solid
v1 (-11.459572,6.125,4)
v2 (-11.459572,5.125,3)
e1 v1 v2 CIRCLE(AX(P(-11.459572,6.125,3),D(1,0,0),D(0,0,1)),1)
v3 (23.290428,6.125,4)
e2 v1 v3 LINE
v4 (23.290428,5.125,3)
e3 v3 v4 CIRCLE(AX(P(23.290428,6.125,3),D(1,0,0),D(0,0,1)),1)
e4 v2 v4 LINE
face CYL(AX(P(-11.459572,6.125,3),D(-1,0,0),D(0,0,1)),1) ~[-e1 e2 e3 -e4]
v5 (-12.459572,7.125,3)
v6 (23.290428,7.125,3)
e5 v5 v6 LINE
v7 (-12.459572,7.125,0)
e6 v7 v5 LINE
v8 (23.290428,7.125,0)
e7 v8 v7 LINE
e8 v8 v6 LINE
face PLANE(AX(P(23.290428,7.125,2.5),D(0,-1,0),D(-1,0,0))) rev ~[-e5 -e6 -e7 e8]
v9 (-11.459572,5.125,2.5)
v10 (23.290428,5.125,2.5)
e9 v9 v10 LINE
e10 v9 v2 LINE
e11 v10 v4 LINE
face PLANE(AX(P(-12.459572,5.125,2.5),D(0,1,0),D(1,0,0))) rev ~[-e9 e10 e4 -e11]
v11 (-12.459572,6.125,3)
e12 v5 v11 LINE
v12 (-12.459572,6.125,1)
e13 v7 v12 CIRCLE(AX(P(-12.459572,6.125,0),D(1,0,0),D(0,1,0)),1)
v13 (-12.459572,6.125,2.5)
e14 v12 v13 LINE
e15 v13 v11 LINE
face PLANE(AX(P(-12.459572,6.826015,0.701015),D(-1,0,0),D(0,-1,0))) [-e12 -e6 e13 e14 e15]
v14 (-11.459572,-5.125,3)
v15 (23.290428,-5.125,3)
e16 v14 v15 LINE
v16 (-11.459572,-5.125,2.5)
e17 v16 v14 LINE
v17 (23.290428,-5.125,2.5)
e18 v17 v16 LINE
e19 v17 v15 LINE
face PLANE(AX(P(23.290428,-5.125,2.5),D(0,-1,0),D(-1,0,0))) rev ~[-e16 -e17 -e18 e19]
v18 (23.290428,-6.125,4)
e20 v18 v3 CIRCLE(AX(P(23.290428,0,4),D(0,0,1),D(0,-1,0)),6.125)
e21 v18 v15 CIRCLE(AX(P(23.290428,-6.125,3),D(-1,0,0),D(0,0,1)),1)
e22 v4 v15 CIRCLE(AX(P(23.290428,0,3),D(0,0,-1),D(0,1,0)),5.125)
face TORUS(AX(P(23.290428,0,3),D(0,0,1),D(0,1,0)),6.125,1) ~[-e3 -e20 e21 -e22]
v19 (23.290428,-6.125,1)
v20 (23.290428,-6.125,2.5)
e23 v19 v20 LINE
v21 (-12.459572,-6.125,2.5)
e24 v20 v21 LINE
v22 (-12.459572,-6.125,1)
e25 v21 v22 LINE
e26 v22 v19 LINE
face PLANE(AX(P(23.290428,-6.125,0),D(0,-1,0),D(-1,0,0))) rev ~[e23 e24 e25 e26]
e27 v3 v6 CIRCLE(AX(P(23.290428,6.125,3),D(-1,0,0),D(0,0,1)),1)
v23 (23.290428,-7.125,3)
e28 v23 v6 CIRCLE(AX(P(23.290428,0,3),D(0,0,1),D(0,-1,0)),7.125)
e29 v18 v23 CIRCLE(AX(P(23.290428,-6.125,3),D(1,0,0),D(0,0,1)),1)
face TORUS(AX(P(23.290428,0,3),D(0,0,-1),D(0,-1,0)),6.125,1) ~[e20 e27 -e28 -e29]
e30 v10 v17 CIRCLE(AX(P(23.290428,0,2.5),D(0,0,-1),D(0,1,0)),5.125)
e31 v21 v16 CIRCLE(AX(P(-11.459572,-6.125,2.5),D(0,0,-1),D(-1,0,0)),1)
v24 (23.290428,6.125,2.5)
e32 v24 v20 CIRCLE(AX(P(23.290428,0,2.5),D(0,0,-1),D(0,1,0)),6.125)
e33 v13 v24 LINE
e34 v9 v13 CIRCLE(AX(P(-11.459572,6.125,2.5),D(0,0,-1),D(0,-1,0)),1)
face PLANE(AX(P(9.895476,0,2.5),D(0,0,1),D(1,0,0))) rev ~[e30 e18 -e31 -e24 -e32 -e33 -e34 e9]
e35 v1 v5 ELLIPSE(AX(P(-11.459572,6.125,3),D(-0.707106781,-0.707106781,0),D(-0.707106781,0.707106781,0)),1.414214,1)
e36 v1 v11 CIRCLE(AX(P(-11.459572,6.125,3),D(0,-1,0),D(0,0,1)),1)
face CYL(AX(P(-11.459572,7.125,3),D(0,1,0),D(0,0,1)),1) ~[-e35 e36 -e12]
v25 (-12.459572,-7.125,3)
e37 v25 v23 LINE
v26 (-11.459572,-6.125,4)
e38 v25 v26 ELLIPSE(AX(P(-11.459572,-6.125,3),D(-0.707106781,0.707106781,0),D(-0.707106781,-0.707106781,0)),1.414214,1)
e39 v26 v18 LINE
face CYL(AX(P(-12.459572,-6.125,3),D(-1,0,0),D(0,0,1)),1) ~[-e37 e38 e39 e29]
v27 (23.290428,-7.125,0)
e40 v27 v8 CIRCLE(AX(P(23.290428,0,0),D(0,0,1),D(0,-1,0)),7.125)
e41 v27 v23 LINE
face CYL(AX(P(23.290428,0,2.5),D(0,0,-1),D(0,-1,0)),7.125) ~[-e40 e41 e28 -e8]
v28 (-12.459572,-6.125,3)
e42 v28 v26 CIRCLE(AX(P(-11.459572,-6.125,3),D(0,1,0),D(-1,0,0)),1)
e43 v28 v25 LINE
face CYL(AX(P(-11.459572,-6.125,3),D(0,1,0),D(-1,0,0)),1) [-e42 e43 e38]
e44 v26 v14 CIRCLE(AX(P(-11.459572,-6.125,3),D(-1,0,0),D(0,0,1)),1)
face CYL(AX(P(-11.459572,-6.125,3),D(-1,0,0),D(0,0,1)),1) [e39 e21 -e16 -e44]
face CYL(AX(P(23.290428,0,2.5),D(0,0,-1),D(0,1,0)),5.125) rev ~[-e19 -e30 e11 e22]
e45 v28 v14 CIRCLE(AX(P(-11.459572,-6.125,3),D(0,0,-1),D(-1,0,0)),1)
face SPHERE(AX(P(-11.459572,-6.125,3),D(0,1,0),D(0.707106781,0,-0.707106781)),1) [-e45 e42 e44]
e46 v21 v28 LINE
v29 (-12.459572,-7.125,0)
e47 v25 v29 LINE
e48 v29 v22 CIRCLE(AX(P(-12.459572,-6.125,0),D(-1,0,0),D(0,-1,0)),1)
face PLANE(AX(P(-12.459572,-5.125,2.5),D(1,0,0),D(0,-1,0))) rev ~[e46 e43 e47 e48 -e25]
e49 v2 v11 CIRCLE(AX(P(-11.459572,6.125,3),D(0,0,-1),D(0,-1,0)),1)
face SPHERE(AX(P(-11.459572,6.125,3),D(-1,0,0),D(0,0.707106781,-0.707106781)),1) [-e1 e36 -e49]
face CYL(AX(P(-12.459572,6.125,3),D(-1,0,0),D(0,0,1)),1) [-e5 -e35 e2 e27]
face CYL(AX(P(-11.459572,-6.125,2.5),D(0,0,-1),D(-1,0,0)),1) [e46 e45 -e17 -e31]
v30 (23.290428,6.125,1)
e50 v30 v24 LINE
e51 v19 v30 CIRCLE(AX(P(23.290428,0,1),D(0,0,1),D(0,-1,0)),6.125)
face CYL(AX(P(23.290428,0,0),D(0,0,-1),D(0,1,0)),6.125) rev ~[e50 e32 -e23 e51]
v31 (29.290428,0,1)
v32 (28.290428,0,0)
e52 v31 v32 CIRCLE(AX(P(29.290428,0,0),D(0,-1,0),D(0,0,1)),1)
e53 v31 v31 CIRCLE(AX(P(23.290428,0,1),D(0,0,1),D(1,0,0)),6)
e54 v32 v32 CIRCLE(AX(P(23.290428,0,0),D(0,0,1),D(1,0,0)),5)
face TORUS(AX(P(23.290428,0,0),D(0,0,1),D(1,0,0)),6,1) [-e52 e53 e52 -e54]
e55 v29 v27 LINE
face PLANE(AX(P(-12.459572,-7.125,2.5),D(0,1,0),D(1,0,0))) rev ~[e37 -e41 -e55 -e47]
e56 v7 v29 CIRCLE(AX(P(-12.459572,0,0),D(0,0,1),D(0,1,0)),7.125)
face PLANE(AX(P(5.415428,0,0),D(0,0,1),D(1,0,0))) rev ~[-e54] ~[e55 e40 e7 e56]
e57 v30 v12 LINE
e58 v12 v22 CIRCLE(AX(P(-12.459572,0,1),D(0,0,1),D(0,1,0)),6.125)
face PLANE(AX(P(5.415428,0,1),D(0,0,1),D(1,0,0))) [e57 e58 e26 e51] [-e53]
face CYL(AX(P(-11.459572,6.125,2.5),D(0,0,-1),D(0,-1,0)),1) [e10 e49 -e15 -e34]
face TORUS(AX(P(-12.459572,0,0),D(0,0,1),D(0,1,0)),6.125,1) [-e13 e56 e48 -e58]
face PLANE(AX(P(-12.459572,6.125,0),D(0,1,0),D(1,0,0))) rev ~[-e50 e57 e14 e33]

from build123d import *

# Parameters (mm, degrees)
F0_R         = 5
F1_DEPTH     = 1
F2_DEPTH     = 2.5
F4_DEPTH     = 1.5
F5_T1_DEPTH  = 35.75
F5_T3_DEPTH  = 1
F5_T5_DEPTH  = 34.75
F5_T7_DEPTH  = 1
F5_T9_DEPTH  = 0.5
F5_S13_W     = 1.02
F5_S13_H     = 1.02
F5_T14_DEPTH = 1.02
F5_S19_W     = 1.02
F5_S19_H     = 1.02
F5_T20_DEPTH = 1.02
F5_T24_ANGLE = 180
F5_T26_ANGLE = 180
F5_T30_ANGLE = 180
F5_T35_DEPTH = 3.5
F5_T39_DEPTH = 38.25
F5_T46_DEPTH = 38.25
F5_T50_DEPTH = 3.5


# Not quite as in the source:
# - a fillet or chamfer that OpenCascade refuses, or shapes differently, is made with other operations: its cross-section is extruded or revolved along the edge and cut away or added


with BuildPart() as f1:
    # F0 (on Top) → F1 (new body)
    with BuildSketch(Plane.XY):
        with BuildLine():
            Line((-12.4595724046, -6.125), (23.2904275954, -6.125))
            ThreePointArc((23.2904275954, -6.125), (29.4154275954, 0), (23.2904275954, 6.125))
            Line((23.2904275954, 6.125), (-12.4595724046, 6.125))
            ThreePointArc((-12.4595724046, 6.125), (-18.5845724046, 0), (-12.4595724046, -6.125))
        make_face()
        with Locations((23.2904275954, 0)):
            Circle(F0_R, mode=Mode.SUBTRACT)
        with BuildLine():
            Line((-12.4595724046, -7.125), (-12.4595724046, -6.125))
            ThreePointArc((-12.4595724046, -6.125), (-18.5845724046, 0), (-12.4595724046, 6.125))
            Line((-12.4595724046, 6.125), (-12.4595724046, 7.125))
            ThreePointArc((-12.4595724046, 7.125), (-19.5845724046, 0), (-12.4595724046, -7.125))
        make_face()
    extrude(amount=F1_DEPTH)

    # F0 (on Top) → F2 (join)
    with BuildSketch(Plane.XY):
        with BuildLine():
            ThreePointArc((23.2904275954, 6.125), (29.4154275954, 0), (23.2904275954, -6.125))
            Line((23.2904275954, -6.125), (-12.4595724046, -6.125))
            Line((-12.4595724046, -6.125), (-12.4595724046, -7.125))
            Line((-12.4595724046, -7.125), (23.2904275954, -7.125))
            ThreePointArc((23.2904275954, -7.125), (30.4154275954, 0), (23.2904275954, 7.125))
            Line((23.2904275954, 7.125), (-12.4595724046, 7.125))
            Line((-12.4595724046, 7.125), (-12.4595724046, 6.125))
            Line((-12.4595724046, 6.125), (23.2904275954, 6.125))
        make_face()
    extrude(amount=F2_DEPTH)

    # F3 (on face) → F4 (join)
    with BuildSketch(Plane.XY.offset(2.5)):
        with BuildLine():
            Line((-12.4595724046, -7.125), (23.2904275954, -7.125))
            ThreePointArc((23.2904275954, -7.125), (30.4154275954, 0), (23.2904275954, 7.125))
            Line((23.2904275954, 7.125), (-12.4595724046, 7.125))
            Line((-12.4595724046, 7.125), (-12.4595724046, 6.125))
            Line((-12.4595724046, 6.125), (23.2904275954, 6.125))
            ThreePointArc((23.2904275954, 6.125), (29.4154275954, 0), (23.2904275954, -6.125))
            Line((23.2904275954, -6.125), (-12.4595724046, -6.125))
            Line((-12.4595724046, -6.125), (-12.4595724046, -7.125))
        make_face()
        with BuildLine():
            Line((-12.4595724046, -5.125), (-12.4595724046, -6.125))
            Line((-12.4595724046, -6.125), (23.2904275954, -6.125))
            ThreePointArc((23.2904275954, -6.125), (29.4154275954, 0), (23.2904275954, 6.125))
            Line((23.2904275954, 6.125), (-12.4595724046, 6.125))
            Line((-12.4595724046, 6.125), (-12.4595724046, 5.125))
            Line((-12.4595724046, 5.125), (23.2904275954, 5.125))
            ThreePointArc((23.2904275954, 5.125), (28.4154275954, 0), (23.2904275954, -5.125))
            Line((23.2904275954, -5.125), (-12.4595724046, -5.125))
        make_face()
    extrude(amount=F4_DEPTH)

    # F5: fillet of radius 1 on 12 edges, made by hand

    # F5_s2 → F5_t1 (cut)
    with BuildSketch(Plane.YZ.offset(-12.4595724046)):
        with BuildLine():
            ThreePointArc((-6.125, 4), (-6.8321067812, 3.7071067812), (-7.125, 3))
            Line((-7.125, 3), (-7.145, 3))
            Line((-7.145, 3), (-7.145, 4.02))
            Line((-7.145, 4.02), (-6.125, 4.02))
            Line((-6.125, 4.02), (-6.125, 4))
        make_face()
        with BuildLine():
            ThreePointArc((6.125, 4), (6.8321067812, 3.7071067812), (7.125, 3))
            Line((7.125, 3), (7.145, 3))
            Line((7.145, 3), (7.145, 4.02))
            Line((7.145, 4.02), (6.125, 4.02))
            Line((6.125, 4.02), (6.125, 4))
        make_face()
    extrude(amount=F5_T1_DEPTH, mode=Mode.SUBTRACT)

    # F5_s4 → F5_t3 (cut)
    with BuildSketch(Plane.XZ.offset(-7.125)):
        with BuildLine():
            ThreePointArc((-11.4595724046, 4), (-12.1666791858, 3.7071067812), (-12.4595724046, 3))
            Line((-12.4595724046, 3), (-12.4795724046, 3))
            Line((-12.4795724046, 3), (-12.4795724046, 4.02))
            Line((-12.4795724046, 4.02), (-11.4595724046, 4.02))
            Line((-11.4595724046, 4.02), (-11.4595724046, 4))
        make_face()
    extrude(amount=F5_T3_DEPTH, mode=Mode.SUBTRACT)

    # F5_s6 → F5_t5 (cut)
    with BuildSketch(Plane.YZ.offset(-11.4595724046)):
        with BuildLine():
            ThreePointArc((6.125, 4), (5.4178932188, 3.7071067812), (5.125, 3))
            Line((5.125, 3), (5.105, 3))
            Line((5.105, 3), (5.105, 4.02))
            Line((5.105, 4.02), (6.125, 4.02))
            Line((6.125, 4.02), (6.125, 4))
        make_face()
        with BuildLine():
            ThreePointArc((-6.125, 4), (-5.4178932188, 3.7071067812), (-5.125, 3))
            Line((-5.125, 3), (-5.105, 3))
            Line((-5.105, 3), (-5.105, 4.02))
            Line((-5.105, 4.02), (-6.125, 4.02))
            Line((-6.125, 4.02), (-6.125, 4))
        make_face()
    extrude(amount=F5_T5_DEPTH, mode=Mode.SUBTRACT)

    # F5_s8 → F5_t7 (cut)
    with BuildSketch(Plane.XZ.offset(6.125)):
        with BuildLine():
            ThreePointArc((-12.4595724046, 3), (-12.1666791858, 3.7071067812), (-11.4595724046, 4))
            Line((-11.4595724046, 4), (-11.4595724046, 4.02))
            Line((-11.4595724046, 4.02), (-12.4795724046, 4.02))
            Line((-12.4795724046, 4.02), (-12.4795724046, 3))
            Line((-12.4795724046, 3), (-12.4595724046, 3))
        make_face()
    extrude(amount=F5_T7_DEPTH, mode=Mode.SUBTRACT)

    # F5_s10 → F5_t9 (cut)
    with BuildSketch(Plane.XY.offset(2.5)):
        with BuildLine():
            ThreePointArc((-12.4595724046, -6.125), (-12.1666791858, -5.4178932188), (-11.4595724046, -5.125))
            Line((-11.4595724046, -5.125), (-11.4595724046, -5.105))
            Line((-11.4595724046, -5.105), (-12.4795724046, -5.105))
            Line((-12.4795724046, -5.105), (-12.4795724046, -6.125))
            Line((-12.4795724046, -6.125), (-12.4595724046, -6.125))
        make_face()
        with BuildLine():
            ThreePointArc((-11.4595724046, 5.125), (-12.1666791858, 5.4178932188), (-12.4595724046, 6.125))
            Line((-12.4595724046, 6.125), (-12.4795724046, 6.125))
            Line((-12.4795724046, 6.125), (-12.4795724046, 5.105))
            Line((-12.4795724046, 5.105), (-11.4595724046, 5.105))
            Line((-11.4595724046, 5.105), (-11.4595724046, 5.125))
        make_face()
    extrude(amount=F5_T9_DEPTH, mode=Mode.SUBTRACT)


with BuildPart() as f5_tool12:
    # F5_s13 → F5_t14 (new body)
    with BuildSketch(Plane.YZ.offset(-11.4595724046)):
        with Locations((5.615, 3.51)):
            Rectangle(F5_S13_W, F5_S13_H)
    extrude(amount=-F5_T14_DEPTH)

    # F5_s15 → F5_t16 (revolve, cut)
    with BuildSketch(Plane(origin=(-11.4595724046, 6.125, 3), x_dir=(0, 0.7071067812, -0.7071067812), z_dir=(0, 0.7071067812, 0.7071067812))):
        with BuildLine():
            ThreePointArc((0, -1), (1, 0), (0, 1))
            Line((0, 1), (0, -1))
        make_face()
    revolve(axis=Axis((-11.4595724046, 6.125, 3), (-1, 0, 0)), mode=Mode.SUBTRACT)


with BuildPart() as f1_1:
    add(f1.part)

    # F5_t11: cut F5_tool12
    add(f5_tool12.part, mode=Mode.SUBTRACT)


with BuildPart() as f5_tool18:
    # F5_s19 → F5_t20 (new body)
    with BuildSketch(Plane.XZ.offset(6.125)):
        with Locations((-11.9695724046, 3.51)):
            Rectangle(F5_S19_W, F5_S19_H)
    extrude(amount=-F5_T20_DEPTH)

    # F5_s21 → F5_t22 (revolve, cut)
    with BuildSketch(Plane(origin=(-11.4595724046, -6.125, 3), x_dir=(0.7071067812, 0, -0.7071067812), z_dir=(0.7071067812, 0, 0.7071067812))):
        with BuildLine():
            ThreePointArc((0, -1), (1, 0), (0, 1))
            Line((0, 1), (0, -1))
        make_face()
    revolve(axis=Axis((-11.4595724046, -6.125, 3), (0, 1, 0)), mode=Mode.SUBTRACT)


with BuildPart() as f1_2:
    add(f1_1.part)

    # F5_t17: cut F5_tool18
    add(f5_tool18.part, mode=Mode.SUBTRACT)

    # F5_s23 → F5_t24 (revolve, cut)
    with BuildSketch(Plane.YZ.offset(23.2904275954)):
        with BuildLine():
            ThreePointArc((-6.125, 4), (-6.8321067812, 3.7071067812), (-7.125, 3))
            Line((-7.125, 3), (-7.145, 3))
            Line((-7.145, 3), (-7.145, 4.02))
            Line((-7.145, 4.02), (-6.125, 4.02))
            Line((-6.125, 4.02), (-6.125, 4))
        make_face()
    revolve(axis=Axis((23.2904275954, 0, 4), (0, 0, 1)), revolution_arc=F5_T24_ANGLE, mode=Mode.SUBTRACT)

    # F5_s25 → F5_t26 (revolve, cut)
    with BuildSketch(Plane.YZ.offset(23.2904275954)):
        with BuildLine():
            ThreePointArc((6.125, 4), (5.4178932188, 3.7071067812), (5.125, 3))
            Line((5.125, 3), (5.105, 3))
            Line((5.105, 3), (5.105, 4.02))
            Line((5.105, 4.02), (6.125, 4.02))
            Line((6.125, 4.02), (6.125, 4))
        make_face()
    revolve(axis=Axis((23.2904275954, 0, 4), (0, 0, -1)), revolution_arc=F5_T26_ANGLE, mode=Mode.SUBTRACT)

    # F5_s27 → F5_t28 (revolve, cut)
    with BuildSketch(Plane.XZ):
        with BuildLine():
            ThreePointArc((29.2904275954, 1), (28.5833208142, 0.7071067812), (28.2904275954, 0))
            Line((28.2904275954, 0), (28.2704275954, 0))
            Line((28.2704275954, 0), (28.2704275954, 1.02))
            Line((28.2704275954, 1.02), (29.2904275954, 1.02))
            Line((29.2904275954, 1.02), (29.2904275954, 1))
        make_face()
    revolve(axis=Axis((23.2904275954, 0, 1), (0, 0, 1)), mode=Mode.SUBTRACT)

    # F5_s29 → F5_t30 (revolve, cut)
    with BuildSketch(Plane.YZ.offset(-12.4595724046)):
        with BuildLine():
            ThreePointArc((7.125, 0), (6.8321067812, 0.7071067812), (6.125, 1))
            Line((6.125, 1), (6.125, 1.02))
            Line((6.125, 1.02), (7.145, 1.02))
            Line((7.145, 1.02), (7.145, 0))
            Line((7.145, 0), (7.125, 0))
        make_face()
    revolve(axis=Axis((-12.4595724046, 0, 1), (0, 0, 1)), revolution_arc=F5_T30_ANGLE, mode=Mode.SUBTRACT)


with BuildPart() as f5_tool33:
    # F5_s34 → F5_t35 (new body)
    with BuildSketch(Plane.XZ.offset(6.125)):
        with BuildLine():
            ThreePointArc((-12.4595724046, 3), (-12.1666791858, 3.7071067812), (-11.4595724046, 4))
            Line((-11.4595724046, 4), (-11.4595724046, 4.02))
            Line((-11.4595724046, 4.02), (-12.4795724046, 4.02))
            Line((-12.4795724046, 4.02), (-12.4795724046, 3))
            Line((-12.4795724046, 3), (-12.4595724046, 3))
        make_face()
    extrude(amount=F5_T35_DEPTH)

    split(bisect_by=Plane.XZ.offset(7.125), keep=Keep.TOP)


with BuildPart() as f5_tool37:
    # F5_s38 → F5_t39 (new body)
    with BuildSketch(Plane.YZ.offset(-14.9595724046)):
        with BuildLine():
            ThreePointArc((-6.125, 4), (-6.8321067812, 3.7071067812), (-7.125, 3))
            Line((-7.125, 3), (-7.145, 3))
            Line((-7.145, 3), (-7.145, 4.02))
            Line((-7.145, 4.02), (-6.125, 4.02))
            Line((-6.125, 4.02), (-6.125, 4))
        make_face()
    extrude(amount=F5_T39_DEPTH)

    split(bisect_by=Plane.YZ.offset(-12.4595724046), keep=Keep.BOTTOM)


with BuildPart() as f5_tool33_1:
    add(f5_tool33.part)

    # F5_t41: intersect F5_tool37
    add(f5_tool37.part, mode=Mode.INTERSECT)


with BuildPart() as f1_3:
    add(f1_2.part)

    # F5_t31: cut F5_tool33
    add(f5_tool33_1.part, mode=Mode.SUBTRACT)


with BuildPart() as f5_tool44:
    # F5_s45 → F5_t46 (new body)
    with BuildSketch(Plane.YZ.offset(23.2904275954)):
        with BuildLine():
            ThreePointArc((6.125, 4), (6.8321067812, 3.7071067812), (7.125, 3))
            Line((7.125, 3), (7.145, 3))
            Line((7.145, 3), (7.145, 4.02))
            Line((7.145, 4.02), (6.125, 4.02))
            Line((6.125, 4.02), (6.125, 4))
        make_face()
    extrude(amount=-F5_T46_DEPTH)

    split(bisect_by=Plane.YZ.offset(-12.4595724046), keep=Keep.BOTTOM)


with BuildPart() as f5_tool48:
    # F5_s49 → F5_t50 (new body)
    with BuildSketch(Plane.XZ.offset(-9.625)):
        with BuildLine():
            ThreePointArc((-11.4595724046, 4), (-12.1666791858, 3.7071067812), (-12.4595724046, 3))
            Line((-12.4595724046, 3), (-12.4795724046, 3))
            Line((-12.4795724046, 3), (-12.4795724046, 4.02))
            Line((-12.4795724046, 4.02), (-11.4595724046, 4.02))
            Line((-11.4595724046, 4.02), (-11.4595724046, 4))
        make_face()
    extrude(amount=F5_T50_DEPTH)

    split(bisect_by=Plane.XZ.offset(-7.125), keep=Keep.BOTTOM)


with BuildPart() as f5_tool44_1:
    add(f5_tool44.part)

    # F5_t52: intersect F5_tool48
    add(f5_tool48.part, mode=Mode.INTERSECT)


with BuildPart() as f1_4:
    add(f1_3.part)

    # F5_t42: cut F5_tool44
    add(f5_tool44_1.part, mode=Mode.SUBTRACT)


solid = f1_4.part
